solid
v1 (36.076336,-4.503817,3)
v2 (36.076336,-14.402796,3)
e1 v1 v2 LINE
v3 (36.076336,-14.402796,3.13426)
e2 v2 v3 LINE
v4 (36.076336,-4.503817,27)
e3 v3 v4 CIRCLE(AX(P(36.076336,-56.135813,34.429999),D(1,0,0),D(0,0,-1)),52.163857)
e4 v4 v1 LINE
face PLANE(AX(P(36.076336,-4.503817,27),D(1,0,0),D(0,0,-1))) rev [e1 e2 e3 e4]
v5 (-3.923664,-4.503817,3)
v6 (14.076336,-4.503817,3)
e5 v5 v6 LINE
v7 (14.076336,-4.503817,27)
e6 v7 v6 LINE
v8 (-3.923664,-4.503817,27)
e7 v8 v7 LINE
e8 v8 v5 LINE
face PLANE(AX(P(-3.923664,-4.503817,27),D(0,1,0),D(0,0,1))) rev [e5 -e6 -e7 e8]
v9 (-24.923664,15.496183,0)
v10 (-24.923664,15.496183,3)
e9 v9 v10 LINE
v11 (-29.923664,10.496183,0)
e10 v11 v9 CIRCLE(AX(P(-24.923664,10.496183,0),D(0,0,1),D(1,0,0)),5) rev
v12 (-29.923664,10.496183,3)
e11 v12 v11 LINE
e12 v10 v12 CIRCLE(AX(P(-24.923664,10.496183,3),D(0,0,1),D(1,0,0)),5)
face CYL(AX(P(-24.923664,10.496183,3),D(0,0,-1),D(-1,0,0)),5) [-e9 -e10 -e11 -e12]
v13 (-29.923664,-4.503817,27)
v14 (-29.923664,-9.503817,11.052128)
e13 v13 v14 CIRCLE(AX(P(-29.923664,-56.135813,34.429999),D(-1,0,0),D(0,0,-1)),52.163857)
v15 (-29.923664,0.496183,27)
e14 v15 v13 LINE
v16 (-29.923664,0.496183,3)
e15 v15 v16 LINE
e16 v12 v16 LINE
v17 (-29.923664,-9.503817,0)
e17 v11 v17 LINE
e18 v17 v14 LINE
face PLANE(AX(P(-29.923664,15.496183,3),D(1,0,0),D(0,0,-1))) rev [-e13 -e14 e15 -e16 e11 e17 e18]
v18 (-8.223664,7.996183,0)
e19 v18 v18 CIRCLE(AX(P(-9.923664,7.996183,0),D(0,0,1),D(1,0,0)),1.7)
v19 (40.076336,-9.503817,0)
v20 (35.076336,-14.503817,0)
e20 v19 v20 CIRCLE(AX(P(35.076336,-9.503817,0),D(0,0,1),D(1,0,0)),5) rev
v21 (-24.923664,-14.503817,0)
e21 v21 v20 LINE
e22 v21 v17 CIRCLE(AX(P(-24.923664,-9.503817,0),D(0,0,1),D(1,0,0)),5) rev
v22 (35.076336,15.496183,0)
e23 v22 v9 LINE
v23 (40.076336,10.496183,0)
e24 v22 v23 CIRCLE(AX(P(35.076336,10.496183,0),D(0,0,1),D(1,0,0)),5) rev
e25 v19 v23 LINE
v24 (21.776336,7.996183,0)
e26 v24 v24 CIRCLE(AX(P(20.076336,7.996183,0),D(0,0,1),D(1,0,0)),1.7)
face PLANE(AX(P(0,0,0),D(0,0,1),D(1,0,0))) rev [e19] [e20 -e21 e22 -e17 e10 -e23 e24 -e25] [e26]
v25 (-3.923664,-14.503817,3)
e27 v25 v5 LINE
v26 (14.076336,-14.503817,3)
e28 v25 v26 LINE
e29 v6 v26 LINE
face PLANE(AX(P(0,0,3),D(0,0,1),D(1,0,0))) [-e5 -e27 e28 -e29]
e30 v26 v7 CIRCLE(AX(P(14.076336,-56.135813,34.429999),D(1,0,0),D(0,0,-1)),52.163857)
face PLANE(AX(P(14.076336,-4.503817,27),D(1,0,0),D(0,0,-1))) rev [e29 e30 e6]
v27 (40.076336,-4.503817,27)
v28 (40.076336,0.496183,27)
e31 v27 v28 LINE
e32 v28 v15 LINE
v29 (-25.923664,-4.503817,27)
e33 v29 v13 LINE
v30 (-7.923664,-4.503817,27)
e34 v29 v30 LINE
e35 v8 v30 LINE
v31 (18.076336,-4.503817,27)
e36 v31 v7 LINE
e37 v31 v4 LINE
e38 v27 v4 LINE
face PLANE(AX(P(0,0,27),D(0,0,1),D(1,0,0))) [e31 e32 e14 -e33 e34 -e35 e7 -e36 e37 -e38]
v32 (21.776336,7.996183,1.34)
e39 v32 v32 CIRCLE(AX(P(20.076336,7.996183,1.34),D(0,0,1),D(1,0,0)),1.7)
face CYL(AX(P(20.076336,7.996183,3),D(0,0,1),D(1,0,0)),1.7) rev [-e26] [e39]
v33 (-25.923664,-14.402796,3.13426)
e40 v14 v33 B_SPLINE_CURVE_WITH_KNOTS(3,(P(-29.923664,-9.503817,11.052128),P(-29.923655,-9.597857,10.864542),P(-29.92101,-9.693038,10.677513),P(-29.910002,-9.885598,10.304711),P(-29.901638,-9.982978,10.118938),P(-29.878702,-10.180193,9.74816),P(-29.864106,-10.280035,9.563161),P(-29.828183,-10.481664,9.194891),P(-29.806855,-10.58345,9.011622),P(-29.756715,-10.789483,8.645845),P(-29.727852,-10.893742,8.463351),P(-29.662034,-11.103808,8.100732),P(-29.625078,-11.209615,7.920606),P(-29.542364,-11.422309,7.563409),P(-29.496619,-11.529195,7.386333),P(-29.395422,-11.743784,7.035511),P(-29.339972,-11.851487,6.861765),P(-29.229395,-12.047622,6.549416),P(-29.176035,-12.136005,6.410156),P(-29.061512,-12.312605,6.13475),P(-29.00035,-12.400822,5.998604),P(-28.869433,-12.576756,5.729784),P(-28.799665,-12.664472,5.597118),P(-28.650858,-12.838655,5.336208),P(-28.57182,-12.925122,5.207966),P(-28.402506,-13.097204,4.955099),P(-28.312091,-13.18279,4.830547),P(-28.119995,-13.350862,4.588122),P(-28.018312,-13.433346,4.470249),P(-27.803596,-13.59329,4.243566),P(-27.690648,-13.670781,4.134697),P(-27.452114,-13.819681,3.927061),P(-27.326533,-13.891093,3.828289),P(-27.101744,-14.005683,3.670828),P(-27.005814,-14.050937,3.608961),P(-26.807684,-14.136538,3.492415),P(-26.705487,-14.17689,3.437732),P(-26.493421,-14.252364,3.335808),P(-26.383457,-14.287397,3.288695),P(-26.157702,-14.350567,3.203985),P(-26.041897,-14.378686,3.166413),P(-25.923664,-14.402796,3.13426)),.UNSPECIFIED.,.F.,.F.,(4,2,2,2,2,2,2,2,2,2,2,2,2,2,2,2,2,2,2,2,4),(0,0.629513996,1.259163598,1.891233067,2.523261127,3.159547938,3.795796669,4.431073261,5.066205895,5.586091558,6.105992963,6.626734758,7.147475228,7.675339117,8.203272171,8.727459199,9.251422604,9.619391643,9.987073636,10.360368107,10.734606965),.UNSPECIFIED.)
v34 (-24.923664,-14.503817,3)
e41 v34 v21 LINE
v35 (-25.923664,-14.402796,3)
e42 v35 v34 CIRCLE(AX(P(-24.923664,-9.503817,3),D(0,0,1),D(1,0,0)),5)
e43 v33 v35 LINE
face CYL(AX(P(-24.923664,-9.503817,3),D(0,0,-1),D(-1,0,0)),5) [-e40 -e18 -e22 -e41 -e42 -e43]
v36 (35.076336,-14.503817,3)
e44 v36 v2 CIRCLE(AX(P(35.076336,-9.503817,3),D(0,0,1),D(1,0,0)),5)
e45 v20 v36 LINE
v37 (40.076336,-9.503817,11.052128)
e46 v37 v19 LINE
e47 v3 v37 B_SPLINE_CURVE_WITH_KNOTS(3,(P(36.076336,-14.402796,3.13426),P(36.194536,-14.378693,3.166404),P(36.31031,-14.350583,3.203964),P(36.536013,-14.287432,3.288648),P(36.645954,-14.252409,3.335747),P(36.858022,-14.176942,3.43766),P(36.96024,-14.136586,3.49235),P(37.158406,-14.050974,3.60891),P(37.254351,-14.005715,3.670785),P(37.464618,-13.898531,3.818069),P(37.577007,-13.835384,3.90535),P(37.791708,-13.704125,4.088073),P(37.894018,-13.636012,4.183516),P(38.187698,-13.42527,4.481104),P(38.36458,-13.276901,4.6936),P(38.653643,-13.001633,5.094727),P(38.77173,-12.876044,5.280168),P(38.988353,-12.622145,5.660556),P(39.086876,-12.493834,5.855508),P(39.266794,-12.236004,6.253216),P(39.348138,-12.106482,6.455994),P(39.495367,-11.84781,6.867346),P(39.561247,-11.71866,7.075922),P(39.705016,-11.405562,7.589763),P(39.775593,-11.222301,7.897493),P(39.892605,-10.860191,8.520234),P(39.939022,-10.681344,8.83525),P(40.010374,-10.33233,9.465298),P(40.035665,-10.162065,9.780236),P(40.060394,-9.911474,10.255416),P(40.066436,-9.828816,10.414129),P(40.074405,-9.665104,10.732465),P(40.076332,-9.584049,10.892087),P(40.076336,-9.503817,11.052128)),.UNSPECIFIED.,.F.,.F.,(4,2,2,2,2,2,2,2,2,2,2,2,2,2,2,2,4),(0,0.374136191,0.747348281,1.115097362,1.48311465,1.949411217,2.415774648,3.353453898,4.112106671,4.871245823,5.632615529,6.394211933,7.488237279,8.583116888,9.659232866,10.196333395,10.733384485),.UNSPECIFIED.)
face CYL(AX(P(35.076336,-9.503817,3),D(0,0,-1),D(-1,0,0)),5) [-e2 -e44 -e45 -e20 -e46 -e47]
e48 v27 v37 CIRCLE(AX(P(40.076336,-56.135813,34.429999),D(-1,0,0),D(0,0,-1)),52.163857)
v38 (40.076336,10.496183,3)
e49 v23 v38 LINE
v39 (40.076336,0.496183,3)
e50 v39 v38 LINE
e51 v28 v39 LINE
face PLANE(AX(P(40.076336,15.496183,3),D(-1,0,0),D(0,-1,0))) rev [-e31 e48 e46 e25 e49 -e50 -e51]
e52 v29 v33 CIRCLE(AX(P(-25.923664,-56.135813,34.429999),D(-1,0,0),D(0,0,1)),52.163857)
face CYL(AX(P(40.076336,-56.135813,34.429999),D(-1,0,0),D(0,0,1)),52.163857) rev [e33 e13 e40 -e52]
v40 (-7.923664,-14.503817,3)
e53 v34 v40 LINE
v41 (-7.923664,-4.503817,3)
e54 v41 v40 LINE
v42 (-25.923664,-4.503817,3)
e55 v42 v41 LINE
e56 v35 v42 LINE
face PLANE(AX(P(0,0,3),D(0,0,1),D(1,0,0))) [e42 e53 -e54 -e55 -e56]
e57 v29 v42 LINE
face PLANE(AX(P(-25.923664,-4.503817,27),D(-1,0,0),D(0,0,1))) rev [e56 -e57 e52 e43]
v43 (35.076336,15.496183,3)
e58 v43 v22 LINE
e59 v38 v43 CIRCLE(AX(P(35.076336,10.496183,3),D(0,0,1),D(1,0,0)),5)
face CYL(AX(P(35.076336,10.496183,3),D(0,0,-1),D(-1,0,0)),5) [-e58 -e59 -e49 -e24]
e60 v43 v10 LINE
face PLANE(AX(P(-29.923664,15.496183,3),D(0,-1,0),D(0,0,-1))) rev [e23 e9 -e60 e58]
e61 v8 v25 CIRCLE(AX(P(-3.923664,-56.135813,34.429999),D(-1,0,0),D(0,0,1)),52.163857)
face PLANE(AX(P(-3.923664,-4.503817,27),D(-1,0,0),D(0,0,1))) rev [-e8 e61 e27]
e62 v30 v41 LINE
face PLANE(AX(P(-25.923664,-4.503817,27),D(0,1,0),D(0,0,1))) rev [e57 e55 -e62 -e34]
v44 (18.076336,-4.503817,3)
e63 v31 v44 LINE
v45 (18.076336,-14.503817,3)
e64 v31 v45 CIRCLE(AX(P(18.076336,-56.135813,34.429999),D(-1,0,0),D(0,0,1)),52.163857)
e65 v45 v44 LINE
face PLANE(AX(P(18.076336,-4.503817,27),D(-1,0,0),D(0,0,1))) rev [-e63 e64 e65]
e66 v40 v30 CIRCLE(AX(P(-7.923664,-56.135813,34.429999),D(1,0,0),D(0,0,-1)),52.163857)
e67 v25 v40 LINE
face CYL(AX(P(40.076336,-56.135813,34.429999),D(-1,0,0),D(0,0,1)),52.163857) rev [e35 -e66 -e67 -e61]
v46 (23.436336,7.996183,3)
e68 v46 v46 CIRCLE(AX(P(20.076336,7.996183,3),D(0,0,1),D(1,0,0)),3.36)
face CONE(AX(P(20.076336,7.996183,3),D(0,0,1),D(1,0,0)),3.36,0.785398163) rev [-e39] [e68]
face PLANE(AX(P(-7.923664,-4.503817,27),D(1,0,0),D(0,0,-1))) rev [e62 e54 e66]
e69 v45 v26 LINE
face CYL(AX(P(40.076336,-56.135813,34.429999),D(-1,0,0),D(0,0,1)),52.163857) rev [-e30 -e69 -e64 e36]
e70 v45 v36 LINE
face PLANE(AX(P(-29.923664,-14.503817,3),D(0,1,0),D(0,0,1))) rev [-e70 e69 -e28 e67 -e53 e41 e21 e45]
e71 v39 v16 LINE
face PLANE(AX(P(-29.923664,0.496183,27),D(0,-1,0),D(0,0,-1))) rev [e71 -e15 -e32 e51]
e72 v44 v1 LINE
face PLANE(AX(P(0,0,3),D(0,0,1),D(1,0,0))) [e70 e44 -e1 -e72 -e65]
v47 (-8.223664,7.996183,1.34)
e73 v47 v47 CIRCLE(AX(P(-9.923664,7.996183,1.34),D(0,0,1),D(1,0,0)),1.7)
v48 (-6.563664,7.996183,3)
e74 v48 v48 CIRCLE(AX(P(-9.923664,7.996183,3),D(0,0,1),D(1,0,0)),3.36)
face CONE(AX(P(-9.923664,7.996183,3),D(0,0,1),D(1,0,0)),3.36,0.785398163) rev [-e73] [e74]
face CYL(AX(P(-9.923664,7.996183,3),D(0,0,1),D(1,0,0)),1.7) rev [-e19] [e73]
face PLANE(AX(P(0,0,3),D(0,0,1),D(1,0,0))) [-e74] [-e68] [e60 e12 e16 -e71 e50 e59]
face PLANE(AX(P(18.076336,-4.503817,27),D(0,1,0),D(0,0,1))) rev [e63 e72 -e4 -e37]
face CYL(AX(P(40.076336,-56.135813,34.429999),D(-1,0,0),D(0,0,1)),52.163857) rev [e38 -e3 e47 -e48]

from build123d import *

# Parameters (mm, degrees)
CROQUIS1_W                                   = 70
CROQUIS1_H                                   = 30
SALIENTE_EXTRUIR1_DEPTH                      = 3
SALIENTE_EXTRUIR2_DEPTH                      = 24
CORTAR_EXTRUIR1_DEPTH                        = 70.000004
CROQUIS5_R                                   = 1.5
CORTAR_EXTRUIR2_DEPTH                        = 3
REFRENTADO_PARA_TORNILLO_TAP_N_CON_C_2_COUNT = 2
REFRENTADO_PARA_TORNILLO_TAP_N_CON_C_2_PITCH = 30
REDONDEO1_R                                  = 5


with BuildPart() as part:
    # Croquis1 → Saliente-Extruir1 (new body)
    with BuildSketch(Plane.XY):
        with Locations((5.076335878, 0.496183206)):
            Rectangle(CROQUIS1_W, CROQUIS1_H)
    extrude(amount=SALIENTE_EXTRUIR1_DEPTH)

    # Croquis3 → Saliente-Extruir2 (add)
    with BuildSketch(Plane.XY.offset(3)):
        Polygon((-29.923664122, 0.496183206), (40.076335878, 0.496183206), (40.076335878, -4.503816794), (40.076335878, -14.503816794), (36.076335878, -14.503816794), (36.076335878, -4.503816794), (18.076335878, -4.503816794), (18.076335878, -14.503816794), (14.076335878, -14.503816794), (14.076335878, -4.503816794), (-3.923664122, -4.503816794), (-3.923664122, -14.503816794), (-7.923664122, -14.503816794), (-7.923664122, -4.503816794), (-25.923664122, -4.503816794), (-25.923664122, -14.503816794), (-29.923664122, -14.503816794), (-29.923664122, -4.503816794), align=None)
    extrude(amount=SALIENTE_EXTRUIR2_DEPTH)

    # Croquis4 → Cortar-Extruir1 (cut)
    with BuildSketch(Plane.ZY.offset(29.923664122)):
        with BuildLine():
            Line((27, -14.503816794), (27, -4.503816794))
            ThreePointArc((27, -4.503816794), (14.366976751, -7.984560996), (3, -14.503816794))
            Line((3, -14.503816794), (27, -14.503816794))
        make_face()
    extrude(amount=-CORTAR_EXTRUIR1_DEPTH, mode=Mode.SUBTRACT)

    # Croquis5 → Cortar-Extruir2 (cut)
    with BuildSketch(Plane.XY.offset(3)):
        with Locations((-9.923664122, 7.996183206)):
            Circle(CROQUIS5_R)
        with Locations(Location((20.076335878, 7.996183206, 0), (0, 0, 180))):
            Circle(CROQUIS5_R)
    extrude(amount=-CORTAR_EXTRUIR2_DEPTH, mode=Mode.SUBTRACT)

    # Croquis7 → Refrentado para tornillo tapón con cabeza plana de clavija de M31 (revolve, cut)
    with BuildSketch(Plane(origin=(-9.923664122, 7.996183206, 3), x_dir=(0, -1, 0), z_dir=(1, 0, 0))):
        Polygon((0, 0), (0, 3), (1.7, 3), (1.7, 1.66), (3.36, 0), align=None)
    refrentado_para_tornillo_tap_n_con_cabez = revolve(axis=Axis((-9.923664122, 7.996183206, 9.35), (0, 0, -1)), mode=Mode.SUBTRACT)

    # Refrentado para tornillo tap_n con c 2: Refrentado para tornillo tapón con cabeza plana de clavija de M31 ×2
    with Locations(*[(i * REFRENTADO_PARA_TORNILLO_TAP_N_CON_C_2_PITCH, 0, 0) for i in range(1, REFRENTADO_PARA_TORNILLO_TAP_N_CON_C_2_COUNT)]):
        add(refrentado_para_tornillo_tap_n_con_cabez, mode=Mode.SUBTRACT)

    # Redondeo1
    # the kernel refuses this fillet: 5 mm, written as the material it takes off along each edge
    with BuildSketch(Plane(origin=(40.076335878, -14.503816794, 15.5), x_dir=(0, 1, 0), z_dir=(0, 0, -1)), Plane(origin=(-29.923664122, -14.503816794, -12.5), x_dir=(0, 1, 0), z_dir=(0, 0, 1)), Plane(origin=(-29.923664122, 15.496183206, -12.5), x_dir=(1, 0, 0), z_dir=(0, 0, 1))) as redondeo1_piece_1:
        with BuildLine():
            CenterArc((REDONDEO1_R, -REDONDEO1_R), REDONDEO1_R, 90, 90)
            Line((0, -REDONDEO1_R), (0, 0))
            Line((0, 0), (REDONDEO1_R, 0))
        make_face()
    extrude(amount=28, mode=Mode.SUBTRACT)
    with BuildSketch(Plane(origin=(40.076335878, 15.496183206, -12.5), x_dir=(-1, 0, 0), z_dir=(0, 0, 1))) as redondeo1_piece_2:
        with BuildLine():
            CenterArc((REDONDEO1_R, REDONDEO1_R), REDONDEO1_R, 180, 90)
            Line((0, REDONDEO1_R), (0, 0))
            Line((0, 0), (REDONDEO1_R, 0))
        make_face()
    extrude(amount=28, mode=Mode.SUBTRACT)


solid = part.part
